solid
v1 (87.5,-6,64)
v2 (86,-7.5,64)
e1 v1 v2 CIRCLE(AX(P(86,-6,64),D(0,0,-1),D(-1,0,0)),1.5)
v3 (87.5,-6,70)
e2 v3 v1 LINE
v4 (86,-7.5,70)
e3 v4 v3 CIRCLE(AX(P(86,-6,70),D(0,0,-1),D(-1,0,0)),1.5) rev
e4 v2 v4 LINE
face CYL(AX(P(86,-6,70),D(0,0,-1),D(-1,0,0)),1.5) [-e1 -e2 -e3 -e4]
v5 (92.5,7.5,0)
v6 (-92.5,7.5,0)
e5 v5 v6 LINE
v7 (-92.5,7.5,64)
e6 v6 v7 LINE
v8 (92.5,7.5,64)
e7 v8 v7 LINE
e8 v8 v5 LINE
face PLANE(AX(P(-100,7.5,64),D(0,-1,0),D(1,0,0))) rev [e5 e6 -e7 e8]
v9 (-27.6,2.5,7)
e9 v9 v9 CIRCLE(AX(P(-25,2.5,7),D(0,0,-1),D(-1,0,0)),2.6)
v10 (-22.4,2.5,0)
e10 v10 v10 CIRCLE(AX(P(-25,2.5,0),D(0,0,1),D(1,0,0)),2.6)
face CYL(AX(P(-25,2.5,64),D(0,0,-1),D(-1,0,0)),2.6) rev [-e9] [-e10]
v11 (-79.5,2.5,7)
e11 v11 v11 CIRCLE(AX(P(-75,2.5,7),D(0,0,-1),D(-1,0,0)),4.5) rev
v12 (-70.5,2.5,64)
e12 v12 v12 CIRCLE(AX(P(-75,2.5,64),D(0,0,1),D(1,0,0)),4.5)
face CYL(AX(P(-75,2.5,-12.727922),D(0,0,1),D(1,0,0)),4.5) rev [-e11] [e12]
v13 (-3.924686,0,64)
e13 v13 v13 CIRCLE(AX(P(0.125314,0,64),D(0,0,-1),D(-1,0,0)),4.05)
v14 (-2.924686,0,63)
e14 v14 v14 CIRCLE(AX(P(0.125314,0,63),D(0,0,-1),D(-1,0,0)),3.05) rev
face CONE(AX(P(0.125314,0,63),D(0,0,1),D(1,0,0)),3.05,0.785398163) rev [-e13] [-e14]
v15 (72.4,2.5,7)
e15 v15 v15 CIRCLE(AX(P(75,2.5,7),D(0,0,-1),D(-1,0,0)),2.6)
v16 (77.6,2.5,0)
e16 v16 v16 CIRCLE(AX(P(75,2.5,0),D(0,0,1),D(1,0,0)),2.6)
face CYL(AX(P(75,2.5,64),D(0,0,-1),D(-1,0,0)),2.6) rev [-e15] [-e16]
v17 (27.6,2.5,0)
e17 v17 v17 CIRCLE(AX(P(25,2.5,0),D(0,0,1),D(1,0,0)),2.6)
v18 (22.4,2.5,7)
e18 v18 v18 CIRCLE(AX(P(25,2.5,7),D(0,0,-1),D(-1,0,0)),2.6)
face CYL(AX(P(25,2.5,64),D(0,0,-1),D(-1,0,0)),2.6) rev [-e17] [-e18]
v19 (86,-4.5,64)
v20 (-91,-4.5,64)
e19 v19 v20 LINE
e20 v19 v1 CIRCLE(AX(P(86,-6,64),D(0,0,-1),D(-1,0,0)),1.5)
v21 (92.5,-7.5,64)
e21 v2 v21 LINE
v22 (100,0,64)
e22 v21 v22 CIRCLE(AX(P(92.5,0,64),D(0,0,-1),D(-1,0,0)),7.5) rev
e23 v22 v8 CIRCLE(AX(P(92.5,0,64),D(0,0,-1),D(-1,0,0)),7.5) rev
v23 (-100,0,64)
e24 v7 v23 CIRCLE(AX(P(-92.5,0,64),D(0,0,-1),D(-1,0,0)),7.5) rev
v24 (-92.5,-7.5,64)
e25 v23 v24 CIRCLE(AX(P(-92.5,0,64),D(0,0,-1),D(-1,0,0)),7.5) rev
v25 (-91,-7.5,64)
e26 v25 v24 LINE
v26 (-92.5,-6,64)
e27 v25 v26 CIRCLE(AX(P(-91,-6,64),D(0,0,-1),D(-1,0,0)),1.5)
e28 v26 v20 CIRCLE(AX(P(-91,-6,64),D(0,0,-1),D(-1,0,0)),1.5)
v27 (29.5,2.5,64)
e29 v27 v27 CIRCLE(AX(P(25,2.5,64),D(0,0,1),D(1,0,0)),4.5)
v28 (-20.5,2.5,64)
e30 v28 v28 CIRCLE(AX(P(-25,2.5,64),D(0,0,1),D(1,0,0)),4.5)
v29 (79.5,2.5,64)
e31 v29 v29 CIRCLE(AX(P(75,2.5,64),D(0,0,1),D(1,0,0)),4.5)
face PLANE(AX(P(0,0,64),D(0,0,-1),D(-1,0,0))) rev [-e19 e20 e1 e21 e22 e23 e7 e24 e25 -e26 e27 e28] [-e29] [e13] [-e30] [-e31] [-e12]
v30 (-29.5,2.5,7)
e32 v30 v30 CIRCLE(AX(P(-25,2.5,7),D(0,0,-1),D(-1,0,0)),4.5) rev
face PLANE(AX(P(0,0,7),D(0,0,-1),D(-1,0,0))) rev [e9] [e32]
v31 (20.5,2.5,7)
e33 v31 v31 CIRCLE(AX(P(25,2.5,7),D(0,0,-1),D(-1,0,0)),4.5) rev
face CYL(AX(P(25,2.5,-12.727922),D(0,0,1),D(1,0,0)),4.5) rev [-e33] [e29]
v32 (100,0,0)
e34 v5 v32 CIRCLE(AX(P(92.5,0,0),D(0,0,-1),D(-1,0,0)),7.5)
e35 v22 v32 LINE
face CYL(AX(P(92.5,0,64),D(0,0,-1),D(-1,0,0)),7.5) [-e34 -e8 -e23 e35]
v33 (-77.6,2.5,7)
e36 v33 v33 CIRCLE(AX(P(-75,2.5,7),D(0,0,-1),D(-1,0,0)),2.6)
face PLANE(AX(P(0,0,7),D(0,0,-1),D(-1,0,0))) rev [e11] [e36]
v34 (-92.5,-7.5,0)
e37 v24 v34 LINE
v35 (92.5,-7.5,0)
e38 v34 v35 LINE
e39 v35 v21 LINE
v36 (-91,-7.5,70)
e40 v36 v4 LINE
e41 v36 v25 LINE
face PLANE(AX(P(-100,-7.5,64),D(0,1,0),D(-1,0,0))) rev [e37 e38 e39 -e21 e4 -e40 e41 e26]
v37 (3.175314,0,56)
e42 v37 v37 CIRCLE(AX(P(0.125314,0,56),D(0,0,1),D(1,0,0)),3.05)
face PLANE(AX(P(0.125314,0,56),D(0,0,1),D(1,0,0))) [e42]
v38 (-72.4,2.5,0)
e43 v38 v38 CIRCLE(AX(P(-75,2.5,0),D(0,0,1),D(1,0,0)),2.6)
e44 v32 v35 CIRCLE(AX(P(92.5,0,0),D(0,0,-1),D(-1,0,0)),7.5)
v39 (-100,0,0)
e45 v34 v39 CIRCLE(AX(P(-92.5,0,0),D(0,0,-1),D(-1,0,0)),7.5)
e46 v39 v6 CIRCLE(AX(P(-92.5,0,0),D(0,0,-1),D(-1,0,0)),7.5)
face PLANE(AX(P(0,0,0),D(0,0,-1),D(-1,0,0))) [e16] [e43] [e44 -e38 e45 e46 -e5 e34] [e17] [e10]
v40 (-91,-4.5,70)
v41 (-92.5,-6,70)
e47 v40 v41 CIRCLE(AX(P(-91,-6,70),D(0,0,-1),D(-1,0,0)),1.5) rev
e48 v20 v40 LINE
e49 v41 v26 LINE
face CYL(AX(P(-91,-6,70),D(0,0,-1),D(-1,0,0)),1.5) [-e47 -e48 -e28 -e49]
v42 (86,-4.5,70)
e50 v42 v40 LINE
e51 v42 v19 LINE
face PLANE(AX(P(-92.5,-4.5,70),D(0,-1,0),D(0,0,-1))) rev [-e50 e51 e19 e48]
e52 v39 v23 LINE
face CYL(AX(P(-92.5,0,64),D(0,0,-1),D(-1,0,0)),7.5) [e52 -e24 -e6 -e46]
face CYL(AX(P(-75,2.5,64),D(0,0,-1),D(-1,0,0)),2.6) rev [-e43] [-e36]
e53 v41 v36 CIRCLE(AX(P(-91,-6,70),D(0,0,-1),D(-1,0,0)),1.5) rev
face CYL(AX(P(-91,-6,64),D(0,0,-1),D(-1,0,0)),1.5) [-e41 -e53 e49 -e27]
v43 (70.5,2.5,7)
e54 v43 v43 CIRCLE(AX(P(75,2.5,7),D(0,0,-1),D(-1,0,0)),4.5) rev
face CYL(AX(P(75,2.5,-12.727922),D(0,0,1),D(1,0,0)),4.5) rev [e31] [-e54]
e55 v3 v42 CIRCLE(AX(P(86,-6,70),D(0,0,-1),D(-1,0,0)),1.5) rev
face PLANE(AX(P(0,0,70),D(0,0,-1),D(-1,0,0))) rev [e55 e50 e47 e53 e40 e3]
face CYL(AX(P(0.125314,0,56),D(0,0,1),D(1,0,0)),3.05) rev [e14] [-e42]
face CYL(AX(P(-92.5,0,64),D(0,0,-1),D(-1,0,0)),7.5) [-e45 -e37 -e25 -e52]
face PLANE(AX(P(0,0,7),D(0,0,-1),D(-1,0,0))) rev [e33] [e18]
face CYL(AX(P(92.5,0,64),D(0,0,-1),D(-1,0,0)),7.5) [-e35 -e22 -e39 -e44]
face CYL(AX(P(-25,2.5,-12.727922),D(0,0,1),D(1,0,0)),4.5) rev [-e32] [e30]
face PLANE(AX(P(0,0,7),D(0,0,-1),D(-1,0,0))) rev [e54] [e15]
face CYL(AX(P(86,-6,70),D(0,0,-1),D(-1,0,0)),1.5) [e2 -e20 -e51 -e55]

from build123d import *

# Parameters (mm, degrees)
SKETCH1_W           = 200
SKETCH1_H           = 15
SKETCH1_R           = 2.6
BOSS_EXTRUDE1_DEPTH = 64
SKETCH2_R           = 4.5
CUT_EXTRUDE1_DEPTH  = 57
FILLET3_R           = 7.5
SKETCH3_W           = 180
SKETCH3_H           = 3
BOSS_EXTRUDE2_DEPTH = 6
FILLET4_R           = 1.5
SKETCH4_R           = 3.05
CUT_EXTRUDE2_DEPTH  = 8
CHAMFER1_SIZE       = 1


with BuildPart() as part:
    # Sketch1 → Boss-Extrude1 (new body)
    with BuildSketch(Plane.XY):
        Rectangle(SKETCH1_W, SKETCH1_H)
        with Locations((75, 2.5)):
            Circle(SKETCH1_R, mode=Mode.SUBTRACT)
        with Locations((25, 2.5)):
            Circle(SKETCH1_R, mode=Mode.SUBTRACT)
        with Locations((-25, 2.5)):
            Circle(SKETCH1_R, mode=Mode.SUBTRACT)
        with Locations((-75, 2.5)):
            Circle(SKETCH1_R, mode=Mode.SUBTRACT)
    extrude(amount=BOSS_EXTRUDE1_DEPTH)

    # Sketch2 → Cut-Extrude1 (cut)
    with BuildSketch(Plane.XY.offset(64)):
        with Locations((-75, 2.5)):
            Circle(SKETCH2_R)
        with Locations((-25, 2.5)):
            Circle(SKETCH2_R)
        with Locations((25, 2.5)):
            Circle(SKETCH2_R)
        with Locations((75, 2.5)):
            Circle(SKETCH2_R)
    extrude(amount=-CUT_EXTRUDE1_DEPTH, mode=Mode.SUBTRACT)

    # Fillet3
    fillet3_edges = [part.edges().sort_by_distance(p)[0] for p in [
        (100, 7.5, 32),
        (100, -7.5, 32),
        (-100, 7.5, 32),
        (-100, -7.5, 32),
    ]]
    fillet(fillet3_edges, radius=FILLET3_R - 0.0001)  # a hair under: the kernel refuses the full size

    # Sketch3 → Boss-Extrude2 (add)
    with BuildSketch(Plane.XY.offset(64)):
        with Locations((-2.5, -6)):
            Rectangle(SKETCH3_W, SKETCH3_H)
    extrude(amount=BOSS_EXTRUDE2_DEPTH)

    # Fillet4
    fillet4_edges = [part.edges().sort_by_distance(p)[0] for p in [
        (87.5, -4.5, 67),
        (87.5, -7.5, 67),
        (-92.5, -7.5, 67),
        (-92.5, -4.5, 67),
    ]]
    fillet(fillet4_edges, radius=FILLET4_R - 0.0001)  # a hair under: the kernel refuses the full size

    # Sketch4 → Cut-Extrude2 (cut)
    with BuildSketch(Plane.XY.offset(64)):
        with Locations((0.125314072, 0)):
            Circle(SKETCH4_R)
    extrude(amount=-CUT_EXTRUDE2_DEPTH, mode=Mode.SUBTRACT)

    # Chamfer1
    chamfer1_edges = [part.edges().sort_by_distance(p)[0] for p in [
        (-2.924685928, 0, 64),
    ]]
    chamfer(chamfer1_edges, length=CHAMFER1_SIZE)


solid = part.part
